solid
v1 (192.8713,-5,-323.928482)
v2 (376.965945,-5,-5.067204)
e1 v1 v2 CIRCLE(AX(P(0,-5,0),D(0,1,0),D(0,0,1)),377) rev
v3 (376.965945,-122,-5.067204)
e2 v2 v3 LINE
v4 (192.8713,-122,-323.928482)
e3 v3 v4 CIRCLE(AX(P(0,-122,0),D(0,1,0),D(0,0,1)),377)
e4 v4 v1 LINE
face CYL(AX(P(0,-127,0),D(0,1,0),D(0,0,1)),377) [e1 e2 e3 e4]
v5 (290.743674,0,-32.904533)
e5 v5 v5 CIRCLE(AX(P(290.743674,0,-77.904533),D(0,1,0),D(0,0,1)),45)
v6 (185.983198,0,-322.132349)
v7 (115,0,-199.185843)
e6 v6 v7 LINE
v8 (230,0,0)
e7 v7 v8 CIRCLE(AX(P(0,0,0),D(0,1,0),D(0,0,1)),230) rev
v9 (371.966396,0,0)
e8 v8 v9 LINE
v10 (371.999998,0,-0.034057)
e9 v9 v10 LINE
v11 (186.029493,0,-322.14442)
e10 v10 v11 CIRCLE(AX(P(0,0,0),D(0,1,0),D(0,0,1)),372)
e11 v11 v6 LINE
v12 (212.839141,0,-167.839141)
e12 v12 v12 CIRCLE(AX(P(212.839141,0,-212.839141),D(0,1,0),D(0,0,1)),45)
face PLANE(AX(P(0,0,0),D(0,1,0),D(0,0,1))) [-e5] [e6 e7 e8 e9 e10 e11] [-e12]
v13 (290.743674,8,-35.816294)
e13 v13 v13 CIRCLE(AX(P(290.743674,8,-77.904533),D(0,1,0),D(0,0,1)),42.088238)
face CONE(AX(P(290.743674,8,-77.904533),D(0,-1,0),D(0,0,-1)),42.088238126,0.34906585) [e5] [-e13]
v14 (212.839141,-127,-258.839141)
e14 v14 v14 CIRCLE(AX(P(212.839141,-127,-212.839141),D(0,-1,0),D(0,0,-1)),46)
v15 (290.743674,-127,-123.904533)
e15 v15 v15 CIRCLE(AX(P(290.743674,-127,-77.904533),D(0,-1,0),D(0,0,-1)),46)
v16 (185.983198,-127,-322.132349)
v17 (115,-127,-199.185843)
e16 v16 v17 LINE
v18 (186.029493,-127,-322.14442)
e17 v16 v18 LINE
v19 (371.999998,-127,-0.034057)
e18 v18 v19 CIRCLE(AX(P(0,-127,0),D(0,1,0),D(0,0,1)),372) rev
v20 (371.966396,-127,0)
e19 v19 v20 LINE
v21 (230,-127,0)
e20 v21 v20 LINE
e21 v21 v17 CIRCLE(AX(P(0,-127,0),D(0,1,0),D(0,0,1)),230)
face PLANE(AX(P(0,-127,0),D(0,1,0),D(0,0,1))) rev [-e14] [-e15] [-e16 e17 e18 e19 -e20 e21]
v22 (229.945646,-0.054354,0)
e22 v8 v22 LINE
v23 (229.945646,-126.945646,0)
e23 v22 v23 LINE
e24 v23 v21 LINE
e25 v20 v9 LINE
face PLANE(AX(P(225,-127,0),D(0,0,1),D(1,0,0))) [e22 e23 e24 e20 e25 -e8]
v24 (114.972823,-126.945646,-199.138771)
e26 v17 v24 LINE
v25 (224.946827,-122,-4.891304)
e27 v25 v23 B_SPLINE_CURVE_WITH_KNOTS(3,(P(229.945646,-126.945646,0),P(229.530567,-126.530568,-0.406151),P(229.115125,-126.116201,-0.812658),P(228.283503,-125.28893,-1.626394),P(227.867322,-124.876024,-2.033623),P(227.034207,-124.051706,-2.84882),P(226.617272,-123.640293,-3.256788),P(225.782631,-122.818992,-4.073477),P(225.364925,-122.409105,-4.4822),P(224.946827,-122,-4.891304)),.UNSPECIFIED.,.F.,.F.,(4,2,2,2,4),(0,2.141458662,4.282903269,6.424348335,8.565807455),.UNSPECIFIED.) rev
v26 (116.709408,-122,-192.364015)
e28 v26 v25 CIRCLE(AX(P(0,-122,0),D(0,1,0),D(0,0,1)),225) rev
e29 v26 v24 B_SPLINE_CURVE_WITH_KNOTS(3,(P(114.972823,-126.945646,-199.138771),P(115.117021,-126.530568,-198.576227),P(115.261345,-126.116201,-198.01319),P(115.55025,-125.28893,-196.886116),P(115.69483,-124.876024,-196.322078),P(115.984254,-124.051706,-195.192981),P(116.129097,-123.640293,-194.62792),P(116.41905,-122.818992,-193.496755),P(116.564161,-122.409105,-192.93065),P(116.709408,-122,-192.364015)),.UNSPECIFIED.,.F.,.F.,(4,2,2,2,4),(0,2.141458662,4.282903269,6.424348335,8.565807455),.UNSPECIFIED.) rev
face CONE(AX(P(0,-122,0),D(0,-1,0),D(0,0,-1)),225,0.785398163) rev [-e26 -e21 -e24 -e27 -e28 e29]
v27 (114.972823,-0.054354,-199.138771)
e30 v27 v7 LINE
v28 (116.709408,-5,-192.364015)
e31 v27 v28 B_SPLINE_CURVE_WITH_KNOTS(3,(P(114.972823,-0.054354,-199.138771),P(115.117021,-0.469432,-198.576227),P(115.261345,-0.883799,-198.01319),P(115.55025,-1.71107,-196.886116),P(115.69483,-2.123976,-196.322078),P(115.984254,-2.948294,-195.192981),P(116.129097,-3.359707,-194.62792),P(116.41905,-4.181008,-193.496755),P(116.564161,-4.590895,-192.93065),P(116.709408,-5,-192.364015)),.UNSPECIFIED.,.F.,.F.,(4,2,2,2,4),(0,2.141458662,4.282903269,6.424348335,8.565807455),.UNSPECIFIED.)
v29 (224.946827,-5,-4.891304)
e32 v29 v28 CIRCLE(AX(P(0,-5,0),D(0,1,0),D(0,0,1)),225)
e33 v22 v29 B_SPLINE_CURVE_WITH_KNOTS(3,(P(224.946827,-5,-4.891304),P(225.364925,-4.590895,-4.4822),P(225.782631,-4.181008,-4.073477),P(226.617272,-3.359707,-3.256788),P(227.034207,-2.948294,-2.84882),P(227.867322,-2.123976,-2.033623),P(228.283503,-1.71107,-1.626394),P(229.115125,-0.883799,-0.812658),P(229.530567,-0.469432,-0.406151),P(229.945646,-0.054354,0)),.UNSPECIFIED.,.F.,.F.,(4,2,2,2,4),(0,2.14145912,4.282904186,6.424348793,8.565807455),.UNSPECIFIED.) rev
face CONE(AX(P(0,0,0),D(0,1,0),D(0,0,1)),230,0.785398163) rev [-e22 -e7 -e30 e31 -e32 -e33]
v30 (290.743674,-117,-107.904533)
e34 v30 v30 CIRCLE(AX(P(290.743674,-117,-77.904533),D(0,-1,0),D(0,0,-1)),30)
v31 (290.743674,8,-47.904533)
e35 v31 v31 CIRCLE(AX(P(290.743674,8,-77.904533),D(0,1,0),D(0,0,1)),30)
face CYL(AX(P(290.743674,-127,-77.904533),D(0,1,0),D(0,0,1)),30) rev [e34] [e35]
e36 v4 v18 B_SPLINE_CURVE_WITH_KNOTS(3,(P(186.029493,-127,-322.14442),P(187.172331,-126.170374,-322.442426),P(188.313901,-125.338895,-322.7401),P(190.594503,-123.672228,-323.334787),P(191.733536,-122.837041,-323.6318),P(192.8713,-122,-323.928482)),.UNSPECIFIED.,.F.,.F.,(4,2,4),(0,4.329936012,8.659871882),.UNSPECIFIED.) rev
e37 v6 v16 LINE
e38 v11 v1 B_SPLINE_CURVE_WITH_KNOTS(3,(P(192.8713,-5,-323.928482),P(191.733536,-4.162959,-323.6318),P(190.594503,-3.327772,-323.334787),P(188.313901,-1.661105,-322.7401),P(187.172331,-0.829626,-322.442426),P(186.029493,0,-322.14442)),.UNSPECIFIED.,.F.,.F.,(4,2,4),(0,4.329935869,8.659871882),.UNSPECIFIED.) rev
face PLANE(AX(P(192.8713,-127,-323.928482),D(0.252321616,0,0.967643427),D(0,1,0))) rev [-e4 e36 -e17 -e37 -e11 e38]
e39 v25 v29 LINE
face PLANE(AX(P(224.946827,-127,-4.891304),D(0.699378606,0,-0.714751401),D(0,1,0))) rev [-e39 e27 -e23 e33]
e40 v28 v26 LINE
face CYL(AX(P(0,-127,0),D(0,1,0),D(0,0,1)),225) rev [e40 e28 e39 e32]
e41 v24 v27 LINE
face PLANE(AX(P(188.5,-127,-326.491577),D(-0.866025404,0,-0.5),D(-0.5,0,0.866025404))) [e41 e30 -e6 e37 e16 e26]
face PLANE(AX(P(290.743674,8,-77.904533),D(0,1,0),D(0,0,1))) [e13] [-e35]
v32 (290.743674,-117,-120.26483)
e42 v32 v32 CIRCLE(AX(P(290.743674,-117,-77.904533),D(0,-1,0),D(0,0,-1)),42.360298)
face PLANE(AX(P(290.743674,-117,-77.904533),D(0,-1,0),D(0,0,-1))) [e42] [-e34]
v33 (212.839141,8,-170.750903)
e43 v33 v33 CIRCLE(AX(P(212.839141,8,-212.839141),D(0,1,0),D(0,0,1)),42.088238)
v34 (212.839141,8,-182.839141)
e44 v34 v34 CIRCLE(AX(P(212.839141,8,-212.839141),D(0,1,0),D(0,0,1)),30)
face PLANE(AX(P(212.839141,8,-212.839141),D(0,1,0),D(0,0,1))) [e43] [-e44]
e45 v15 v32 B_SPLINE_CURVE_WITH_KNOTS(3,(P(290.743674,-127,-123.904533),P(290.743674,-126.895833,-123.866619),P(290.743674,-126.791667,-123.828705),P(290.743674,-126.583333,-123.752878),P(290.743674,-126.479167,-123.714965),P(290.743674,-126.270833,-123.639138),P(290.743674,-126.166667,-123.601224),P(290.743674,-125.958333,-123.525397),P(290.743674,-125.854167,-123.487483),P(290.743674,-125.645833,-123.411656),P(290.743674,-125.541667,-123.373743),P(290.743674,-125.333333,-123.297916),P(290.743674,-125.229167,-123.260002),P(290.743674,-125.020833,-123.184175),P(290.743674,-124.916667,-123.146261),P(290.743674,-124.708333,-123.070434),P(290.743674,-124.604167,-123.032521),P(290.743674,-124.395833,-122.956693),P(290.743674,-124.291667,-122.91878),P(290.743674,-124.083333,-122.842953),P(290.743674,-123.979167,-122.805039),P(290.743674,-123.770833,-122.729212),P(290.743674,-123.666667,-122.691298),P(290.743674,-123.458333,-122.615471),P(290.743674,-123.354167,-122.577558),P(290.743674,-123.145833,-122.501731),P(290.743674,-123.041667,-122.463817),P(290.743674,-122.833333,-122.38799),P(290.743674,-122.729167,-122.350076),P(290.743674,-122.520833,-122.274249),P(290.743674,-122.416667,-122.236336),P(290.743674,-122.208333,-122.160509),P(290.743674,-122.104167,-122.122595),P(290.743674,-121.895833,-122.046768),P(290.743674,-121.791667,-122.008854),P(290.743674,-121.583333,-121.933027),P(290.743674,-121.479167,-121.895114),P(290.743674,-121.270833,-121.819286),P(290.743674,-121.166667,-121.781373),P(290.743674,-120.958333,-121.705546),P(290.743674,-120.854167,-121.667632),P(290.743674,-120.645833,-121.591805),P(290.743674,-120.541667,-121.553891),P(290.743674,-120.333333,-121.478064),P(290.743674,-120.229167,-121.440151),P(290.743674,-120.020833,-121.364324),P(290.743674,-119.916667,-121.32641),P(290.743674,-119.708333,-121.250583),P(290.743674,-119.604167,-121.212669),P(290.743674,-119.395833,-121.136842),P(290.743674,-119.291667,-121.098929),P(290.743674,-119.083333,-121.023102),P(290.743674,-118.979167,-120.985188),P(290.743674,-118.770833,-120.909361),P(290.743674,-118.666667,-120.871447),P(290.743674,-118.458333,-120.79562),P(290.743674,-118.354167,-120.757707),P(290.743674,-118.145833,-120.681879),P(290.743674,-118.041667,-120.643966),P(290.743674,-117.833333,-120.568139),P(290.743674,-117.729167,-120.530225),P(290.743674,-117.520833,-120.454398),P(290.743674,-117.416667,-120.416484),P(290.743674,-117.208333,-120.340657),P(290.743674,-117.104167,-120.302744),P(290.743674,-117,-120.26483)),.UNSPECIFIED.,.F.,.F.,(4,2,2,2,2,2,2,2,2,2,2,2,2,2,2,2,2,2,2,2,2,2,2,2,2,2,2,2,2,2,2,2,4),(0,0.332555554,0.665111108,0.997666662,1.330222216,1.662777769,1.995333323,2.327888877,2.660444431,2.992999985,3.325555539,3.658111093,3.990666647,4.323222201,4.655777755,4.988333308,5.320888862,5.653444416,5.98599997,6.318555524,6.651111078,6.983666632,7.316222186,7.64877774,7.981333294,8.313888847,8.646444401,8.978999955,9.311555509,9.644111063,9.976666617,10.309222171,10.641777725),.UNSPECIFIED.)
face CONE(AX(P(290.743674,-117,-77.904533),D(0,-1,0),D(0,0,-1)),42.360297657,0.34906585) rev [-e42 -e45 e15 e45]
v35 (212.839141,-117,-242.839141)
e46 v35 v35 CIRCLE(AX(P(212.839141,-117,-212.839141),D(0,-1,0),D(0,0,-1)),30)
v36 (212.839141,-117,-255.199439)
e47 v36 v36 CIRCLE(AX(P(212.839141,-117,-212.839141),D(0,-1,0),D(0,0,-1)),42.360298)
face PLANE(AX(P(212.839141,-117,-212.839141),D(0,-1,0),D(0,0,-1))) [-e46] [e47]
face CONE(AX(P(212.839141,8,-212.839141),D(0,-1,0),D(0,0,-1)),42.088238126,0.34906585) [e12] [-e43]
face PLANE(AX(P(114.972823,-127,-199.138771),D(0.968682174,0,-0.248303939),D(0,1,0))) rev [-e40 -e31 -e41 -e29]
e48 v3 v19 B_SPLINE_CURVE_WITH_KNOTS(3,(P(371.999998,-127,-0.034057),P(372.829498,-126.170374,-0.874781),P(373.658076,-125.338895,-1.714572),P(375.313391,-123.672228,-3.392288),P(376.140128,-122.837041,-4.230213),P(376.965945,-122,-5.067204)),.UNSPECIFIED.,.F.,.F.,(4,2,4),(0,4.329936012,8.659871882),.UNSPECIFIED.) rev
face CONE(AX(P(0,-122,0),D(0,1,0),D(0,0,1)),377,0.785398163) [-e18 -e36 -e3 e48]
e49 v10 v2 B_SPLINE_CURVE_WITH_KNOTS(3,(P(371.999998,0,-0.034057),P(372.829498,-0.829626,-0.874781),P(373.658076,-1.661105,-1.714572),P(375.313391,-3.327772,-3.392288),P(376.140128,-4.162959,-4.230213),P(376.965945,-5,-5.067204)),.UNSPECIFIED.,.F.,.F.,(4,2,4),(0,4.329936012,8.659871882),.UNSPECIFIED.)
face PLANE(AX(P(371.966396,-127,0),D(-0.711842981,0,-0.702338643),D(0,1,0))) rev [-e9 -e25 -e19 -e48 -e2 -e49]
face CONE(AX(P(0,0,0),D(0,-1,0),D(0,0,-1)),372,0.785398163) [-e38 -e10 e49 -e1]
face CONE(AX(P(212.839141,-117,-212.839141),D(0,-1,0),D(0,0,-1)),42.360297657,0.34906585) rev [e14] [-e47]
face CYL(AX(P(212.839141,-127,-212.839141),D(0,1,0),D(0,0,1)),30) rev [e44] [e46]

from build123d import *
from OCP.BRepFilletAPI import BRepFilletAPI_MakeChamfer

# Parameters (mm, degrees)
SKETCH1_R           = 30
BOSS_EXTRUDE1_DEPTH = 127
BOSS_EXTRUDE2_START = 8
SKETCH2_R           = 45
SKETCH2_R_2         = 30
BOSS_EXTRUDE2_DEPTH = 8
CHAMFER1_SIZE       = 2.911761874
CHAMFER1_SIZE_2     = 8
CUT_EXTRUDE1_START  = -10
SKETCH3_R           = 46
SKETCH3_R_2         = 30
CUT_EXTRUDE1_DEPTH  = 10
CHAMFER2_SIZE       = 3.639702343
CHAMFER2_SIZE_2     = 10


# Some blends are built 0.0001 mm under size
with BuildPart() as part:
    # Sketch1 → Boss-Extrude1 (new body)
    with BuildSketch(Plane(origin=(0, 0, 0), x_dir=(1, 0, 0), z_dir=(0, 1, 0))):
        with BuildLine():
            Line((225, 0), (377, 0))
            ThreePointArc((377, 0), (326.491577227, 188.5), (188.5, 326.491577227))
            Line((188.5, 326.491577227), (112.5, 194.855715852))
            ThreePointArc((112.5, 194.855715852), (194.855715851, 112.5), (225, 0))
        make_face()
        with Locations(Location((212.839141137, 212.839141137, 0), (0, 0, 270))):
            Circle(SKETCH1_R, mode=Mode.SUBTRACT)
        with Locations(Location((290.743673713, 77.904532576, 0), (0, 0, 270))):
            Circle(SKETCH1_R, mode=Mode.SUBTRACT)
    extrude(amount=-BOSS_EXTRUDE1_DEPTH)

    # Sketch2 → Boss-Extrude2 (add)
    # profile 1 of 2: a face of its own
    with BuildSketch(Plane(origin=(0, 0, 0), x_dir=(1, 0, 0), z_dir=(0, 1, 0)).offset(BOSS_EXTRUDE2_START)):
        with Locations(Location((212.839141137, 212.839141137, 0), (0, 0, 270))):
            Circle(SKETCH2_R)
        with Locations(Location((212.839141137, 212.839141137, 0), (0, 0, 270))):
            Circle(SKETCH2_R_2, mode=Mode.SUBTRACT)
    # profile 2 of 2: a face of its own
    with BuildSketch(Plane(origin=(0, 0, 0), x_dir=(1, 0, 0), z_dir=(0, 1, 0)).offset(BOSS_EXTRUDE2_START)):
        with Locations(Location((290.743673713, 77.904532576, 0), (0, 0, 270))):
            Circle(SKETCH2_R)
        with Locations(Location((290.743673713, 77.904532576, 0), (0, 0, 270))):
            Circle(SKETCH2_R_2, mode=Mode.SUBTRACT)
    extrude(amount=-BOSS_EXTRUDE2_DEPTH)

    # Chamfer1
    chamfer1_edges_1 = [part.edges().sort_by_distance(p)[0] for p in [
        (212.839141137, 8, -257.839141137),
    ]]
    chamfer1_side_1 = [part.faces().sort_by_distance(p)[0] for p in [
        (212.839141137, 8, -257.7809059),
    ]]
    chamfer1_edges_2 = [part.edges().sort_by_distance(p)[0] for p in [
        (290.743673713, 8, -122.904532576),
    ]]
    chamfer1_side_2 = [part.faces().sort_by_distance(p)[0] for p in [
        (290.743673713, 8, -122.846297338),
    ]]
    chamfer1 = BRepFilletAPI_MakeChamfer(part.part.solid().wrapped)
    for e in chamfer1_edges_1:
        chamfer1.Add(CHAMFER1_SIZE - 0.0001, CHAMFER1_SIZE_2 - 0.0001, e.wrapped, chamfer1_side_1[0].wrapped)
    for e in chamfer1_edges_2:
        chamfer1.Add(CHAMFER1_SIZE - 0.0001, CHAMFER1_SIZE_2 - 0.0001, e.wrapped, chamfer1_side_2[0].wrapped)
    add(Compound.cast(chamfer1.Shape()), mode=Mode.REPLACE)  # a hair under: the kernel refuses the full size

    # Sketch3 → Cut-Extrude1 (cut)
    # profile 1 of 2: a face of its own
    with BuildSketch(Plane.XZ.offset(127).offset(CUT_EXTRUDE1_START)):
        with Locations(Location((290.743673713, -77.904532576, 0), (0, 0, 270))):
            Circle(SKETCH3_R)
        with Locations(Location((290.743673713, -77.904532576, 0), (0, 0, 90))):
            Circle(SKETCH3_R_2, mode=Mode.SUBTRACT)
    # profile 2 of 2: a face of its own
    with BuildSketch(Plane.XZ.offset(127).offset(CUT_EXTRUDE1_START)):
        with Locations(Location((212.839141137, -212.839141137, 0), (0, 0, 270))):
            Circle(SKETCH3_R)
        with Locations(Location((212.839141137, -212.839141137, 0), (0, 0, 90))):
            Circle(SKETCH3_R_2, mode=Mode.SUBTRACT)
    extrude(amount=CUT_EXTRUDE1_DEPTH, mode=Mode.SUBTRACT)

    # Chamfer2
    chamfer2_edges_1 = [part.edges().sort_by_distance(p)[0] for p in [
        (290.743673713, -117, -31.904532576),
    ]]
    chamfer2_side_1 = [part.faces().sort_by_distance(p)[0] for p in [
        (290.743673713, -117, -31.977326623),
    ]]
    chamfer2_edges_2 = [part.edges().sort_by_distance(p)[0] for p in [
        (212.839141137, -117, -166.839141137),
    ]]
    chamfer2_side_2 = [part.faces().sort_by_distance(p)[0] for p in [
        (212.839141137, -117.072794047, -166.839141137),
    ]]
    chamfer2 = BRepFilletAPI_MakeChamfer(part.part.solid().wrapped)
    for e in chamfer2_edges_1:
        chamfer2.Add(CHAMFER2_SIZE - 0.0001, CHAMFER2_SIZE_2 - 0.0001, e.wrapped, chamfer2_side_1[0].wrapped)
    for e in chamfer2_edges_2:
        chamfer2.Add(CHAMFER2_SIZE_2 - 0.0001, CHAMFER2_SIZE - 0.0001, e.wrapped, chamfer2_side_2[0].wrapped)
    add(Compound.cast(chamfer2.Shape()), mode=Mode.REPLACE)  # a hair under: the kernel refuses the full size

    # Chamfer3
    # the kernel refuses this chamfer: 5 mm, written as the material it takes off along each edge
    with BuildSketch(Plane(origin=(0, -127, 0), x_dir=(0.9994181981512107, 0, 0.03410667389511293), z_dir=(-0.03410667389511293, 0, 0.9994181981512107))) as chamfer3_piece_1:
        with BuildLine():
            Line((371.858578644, -0.141421356), (377.141421356, 5.141421356))
            Line((377.141421356, 5.141421356), (377.241421356, 5.141421356))
            ThreePointArc((377.241421356, 5.141421356), (377.1, 2.570710678), (377.1, 0))
            Line((377.1, 0), (377, -0.1))
            ThreePointArc((377, -0.1), (374.429289322, -0.1), (371.858578644, -0.241421356))
            Line((371.858578644, -0.241421356), (371.858578644, -0.141421356))
        make_face()
    revolve(axis=Axis((0, -127, 0), (0, 1, 0)), revolution_arc=63.90909507, mode=Mode.SUBTRACT)
    with BuildSketch(Plane(origin=(0, -127, 0), x_dir=(0.4497094956032867, 0, -0.8931748818480272), z_dir=(-0.8931748818480272, 0, -0.4497094956032867))) as chamfer3_piece_2:
        with BuildLine():
            Line((230.141421356, 0.141421356), (224.858578644, -5.141421356))
            Line((224.858578644, -5.141421356), (224.758578644, -5.141421356))
            ThreePointArc((224.758578644, -5.141421356), (224.9, -2.570710678), (224.9, 0))
            Line((224.9, 0), (225, 0.1))
            ThreePointArc((225, 0.1), (227.570710678, 0.1), (230.141421356, 0.241421356))
            Line((230.141421356, 0.241421356), (230.141421356, 0.141421356))
        make_face()
    revolve(axis=Axis((0, -127, 0), (0, -1, 0)), revolution_arc=66.549905963, mode=Mode.SUBTRACT)
    with BuildSketch(Plane(origin=(0, 0, 0), x_dir=(0.9994181981512107, 0, 0.03410667389511288), z_dir=(-0.03410667389511288, 0, 0.9994181981512107))) as chamfer3_piece_3:
        with BuildLine():
            Line((377.141421356, -5.141421356), (371.858578644, 0.141421356))
            Line((371.858578644, 0.141421356), (371.858578644, 0.241421356))
            ThreePointArc((371.858578644, 0.241421356), (374.429289322, 0.1), (377, 0.1))
            Line((377, 0.1), (377.1, 0))
            ThreePointArc((377.1, 0), (377.1, -2.570710678), (377.241421356, -5.141421356))
            Line((377.241421356, -5.141421356), (377.141421356, -5.141421356))
        make_face()
    revolve(axis=Axis((0, 0, 0), (0, 1, 0)), revolution_arc=63.90909507, mode=Mode.SUBTRACT)
    with BuildSketch(Plane(origin=(0, 0, 0), x_dir=(0.4497094956032867, 0, -0.8931748818480272), z_dir=(-0.8931748818480272, 0, -0.4497094956032867))) as chamfer3_piece_4:
        with BuildLine():
            Line((224.858578644, 5.141421356), (230.141421356, -0.141421356))
            Line((230.141421356, -0.141421356), (230.141421356, -0.241421356))
            ThreePointArc((230.141421356, -0.241421356), (227.570710678, -0.1), (225, -0.1))
            Line((225, -0.1), (224.9, 0))
            ThreePointArc((224.9, 0), (224.9, 2.570710678), (224.758578644, 5.141421356))
            Line((224.758578644, 5.141421356), (224.858578644, 5.141421356))
        make_face()
    revolve(axis=Axis((0, 0, 0), (0, -1, 0)), revolution_arc=66.549905963, mode=Mode.SUBTRACT)
    with BuildSketch(Plane(origin=(112.5, 12.726295315, -194.855715852), x_dir=(0.4760148236193062, 0, -0.8794372562580466), z_dir=(0, -1, 0))) as chamfer3_piece_5:
        with BuildLine():
            Line((5.090518126, 0), (-0.33429411, 5.023891374))
            Line((-0.33429411, 5.023891374), (-0.434172994, 5.018971161))
            ThreePointArc((-0.434172994, 5.018971161), (-0.183141977, 2.511326919), (-0.099962242, -0.00274777))
            Line((-0.099962242, -0.00274777), (0.00274777, -0.099962242))
            ThreePointArc((0.00274777, -0.099962242), (2.546085101, -0.030050788), (5.093265896, -0.099962242))
            Line((5.093265896, -0.099962242), (5.090518126, 0))
        make_face()
    extrude(amount=152.452590629, mode=Mode.SUBTRACT)
    with BuildSketch(Plane(origin=(188.5, 13.026648977, -326.491577227), x_dir=(-0.5236311743551006, 0, 0.8519450646863905), z_dir=(0, -1, 0))) as chamfer3_piece_6:
        with BuildLine():
            Line((5.176029718, 0), (-0.249663351, -5.204674974))
            Line((-0.249663351, -5.204674974), (-0.349653457, -5.203268263))
            ThreePointArc((-0.349653457, -5.203268263), (-0.162620276, -2.601558906), (-0.099962166, 0.002750537))
            Line((-0.099962166, 0.002750537), (0.002750537, 0.099962166))
            ThreePointArc((0.002750537, 0.099962166), (2.588807445, 0.0288048), (5.178780254, 0.099962166))
            Line((5.178780254, 0.099962166), (5.176029718, 0))
        make_face()
    extrude(amount=153.053297954, mode=Mode.SUBTRACT)
    with BuildSketch(Plane(origin=(377, 13.026648977, 0), x_dir=(0.02042205911014994, 0, -0.9997914480038833), z_dir=(0, -1, 0))) as chamfer3_piece_7:
        with BuildLine():
            Line((5.210659591, 0), (-0.248004097, -5.170084874))
            Line((-0.248004097, -5.170084874), (-0.347983242, -5.168042668))
            ThreePointArc((-0.347983242, -5.168042668), (-0.152811741, -2.584453961), (-0.099979145, 0.002042206))
            Line((-0.099979145, 0.002042206), (0.002042206, 0.099979145))
            ThreePointArc((0.002042206, 0.099979145), (2.60636271, 0.037782504), (5.214045418, 0.099942664))
            Line((5.214045418, 0.099942664), (5.210659591, 0))
        make_face()
    extrude(amount=153.053297954, mode=Mode.SUBTRACT)
    with BuildSketch(Plane(origin=(225, 12.726295315, 0), x_dir=(-0.03895191023079492, 0, -0.999241086369737), z_dir=(0, -1, 0))) as chamfer3_piece_8:
        with BuildLine():
            Line((5.0350012, 0), (-0.337980103, 5.0792858))
            Line((-0.337980103, 5.0792858), (-0.437904212, 5.075390609))
            ThreePointArc((-0.437904212, 5.075390609), (-0.199029377, 2.538471922), (-0.099924109, -0.003895191))
            Line((-0.099924109, -0.003895191), (0.003895191, -0.099924109))
            ThreePointArc((0.003895191, -0.099924109), (2.517945165, -0.016000711), (5.036723207, -0.099985172))
            Line((5.036723207, -0.099985172), (5.0350012, 0))
        make_face()
    extrude(amount=152.452590629, mode=Mode.SUBTRACT)


solid = part.part
